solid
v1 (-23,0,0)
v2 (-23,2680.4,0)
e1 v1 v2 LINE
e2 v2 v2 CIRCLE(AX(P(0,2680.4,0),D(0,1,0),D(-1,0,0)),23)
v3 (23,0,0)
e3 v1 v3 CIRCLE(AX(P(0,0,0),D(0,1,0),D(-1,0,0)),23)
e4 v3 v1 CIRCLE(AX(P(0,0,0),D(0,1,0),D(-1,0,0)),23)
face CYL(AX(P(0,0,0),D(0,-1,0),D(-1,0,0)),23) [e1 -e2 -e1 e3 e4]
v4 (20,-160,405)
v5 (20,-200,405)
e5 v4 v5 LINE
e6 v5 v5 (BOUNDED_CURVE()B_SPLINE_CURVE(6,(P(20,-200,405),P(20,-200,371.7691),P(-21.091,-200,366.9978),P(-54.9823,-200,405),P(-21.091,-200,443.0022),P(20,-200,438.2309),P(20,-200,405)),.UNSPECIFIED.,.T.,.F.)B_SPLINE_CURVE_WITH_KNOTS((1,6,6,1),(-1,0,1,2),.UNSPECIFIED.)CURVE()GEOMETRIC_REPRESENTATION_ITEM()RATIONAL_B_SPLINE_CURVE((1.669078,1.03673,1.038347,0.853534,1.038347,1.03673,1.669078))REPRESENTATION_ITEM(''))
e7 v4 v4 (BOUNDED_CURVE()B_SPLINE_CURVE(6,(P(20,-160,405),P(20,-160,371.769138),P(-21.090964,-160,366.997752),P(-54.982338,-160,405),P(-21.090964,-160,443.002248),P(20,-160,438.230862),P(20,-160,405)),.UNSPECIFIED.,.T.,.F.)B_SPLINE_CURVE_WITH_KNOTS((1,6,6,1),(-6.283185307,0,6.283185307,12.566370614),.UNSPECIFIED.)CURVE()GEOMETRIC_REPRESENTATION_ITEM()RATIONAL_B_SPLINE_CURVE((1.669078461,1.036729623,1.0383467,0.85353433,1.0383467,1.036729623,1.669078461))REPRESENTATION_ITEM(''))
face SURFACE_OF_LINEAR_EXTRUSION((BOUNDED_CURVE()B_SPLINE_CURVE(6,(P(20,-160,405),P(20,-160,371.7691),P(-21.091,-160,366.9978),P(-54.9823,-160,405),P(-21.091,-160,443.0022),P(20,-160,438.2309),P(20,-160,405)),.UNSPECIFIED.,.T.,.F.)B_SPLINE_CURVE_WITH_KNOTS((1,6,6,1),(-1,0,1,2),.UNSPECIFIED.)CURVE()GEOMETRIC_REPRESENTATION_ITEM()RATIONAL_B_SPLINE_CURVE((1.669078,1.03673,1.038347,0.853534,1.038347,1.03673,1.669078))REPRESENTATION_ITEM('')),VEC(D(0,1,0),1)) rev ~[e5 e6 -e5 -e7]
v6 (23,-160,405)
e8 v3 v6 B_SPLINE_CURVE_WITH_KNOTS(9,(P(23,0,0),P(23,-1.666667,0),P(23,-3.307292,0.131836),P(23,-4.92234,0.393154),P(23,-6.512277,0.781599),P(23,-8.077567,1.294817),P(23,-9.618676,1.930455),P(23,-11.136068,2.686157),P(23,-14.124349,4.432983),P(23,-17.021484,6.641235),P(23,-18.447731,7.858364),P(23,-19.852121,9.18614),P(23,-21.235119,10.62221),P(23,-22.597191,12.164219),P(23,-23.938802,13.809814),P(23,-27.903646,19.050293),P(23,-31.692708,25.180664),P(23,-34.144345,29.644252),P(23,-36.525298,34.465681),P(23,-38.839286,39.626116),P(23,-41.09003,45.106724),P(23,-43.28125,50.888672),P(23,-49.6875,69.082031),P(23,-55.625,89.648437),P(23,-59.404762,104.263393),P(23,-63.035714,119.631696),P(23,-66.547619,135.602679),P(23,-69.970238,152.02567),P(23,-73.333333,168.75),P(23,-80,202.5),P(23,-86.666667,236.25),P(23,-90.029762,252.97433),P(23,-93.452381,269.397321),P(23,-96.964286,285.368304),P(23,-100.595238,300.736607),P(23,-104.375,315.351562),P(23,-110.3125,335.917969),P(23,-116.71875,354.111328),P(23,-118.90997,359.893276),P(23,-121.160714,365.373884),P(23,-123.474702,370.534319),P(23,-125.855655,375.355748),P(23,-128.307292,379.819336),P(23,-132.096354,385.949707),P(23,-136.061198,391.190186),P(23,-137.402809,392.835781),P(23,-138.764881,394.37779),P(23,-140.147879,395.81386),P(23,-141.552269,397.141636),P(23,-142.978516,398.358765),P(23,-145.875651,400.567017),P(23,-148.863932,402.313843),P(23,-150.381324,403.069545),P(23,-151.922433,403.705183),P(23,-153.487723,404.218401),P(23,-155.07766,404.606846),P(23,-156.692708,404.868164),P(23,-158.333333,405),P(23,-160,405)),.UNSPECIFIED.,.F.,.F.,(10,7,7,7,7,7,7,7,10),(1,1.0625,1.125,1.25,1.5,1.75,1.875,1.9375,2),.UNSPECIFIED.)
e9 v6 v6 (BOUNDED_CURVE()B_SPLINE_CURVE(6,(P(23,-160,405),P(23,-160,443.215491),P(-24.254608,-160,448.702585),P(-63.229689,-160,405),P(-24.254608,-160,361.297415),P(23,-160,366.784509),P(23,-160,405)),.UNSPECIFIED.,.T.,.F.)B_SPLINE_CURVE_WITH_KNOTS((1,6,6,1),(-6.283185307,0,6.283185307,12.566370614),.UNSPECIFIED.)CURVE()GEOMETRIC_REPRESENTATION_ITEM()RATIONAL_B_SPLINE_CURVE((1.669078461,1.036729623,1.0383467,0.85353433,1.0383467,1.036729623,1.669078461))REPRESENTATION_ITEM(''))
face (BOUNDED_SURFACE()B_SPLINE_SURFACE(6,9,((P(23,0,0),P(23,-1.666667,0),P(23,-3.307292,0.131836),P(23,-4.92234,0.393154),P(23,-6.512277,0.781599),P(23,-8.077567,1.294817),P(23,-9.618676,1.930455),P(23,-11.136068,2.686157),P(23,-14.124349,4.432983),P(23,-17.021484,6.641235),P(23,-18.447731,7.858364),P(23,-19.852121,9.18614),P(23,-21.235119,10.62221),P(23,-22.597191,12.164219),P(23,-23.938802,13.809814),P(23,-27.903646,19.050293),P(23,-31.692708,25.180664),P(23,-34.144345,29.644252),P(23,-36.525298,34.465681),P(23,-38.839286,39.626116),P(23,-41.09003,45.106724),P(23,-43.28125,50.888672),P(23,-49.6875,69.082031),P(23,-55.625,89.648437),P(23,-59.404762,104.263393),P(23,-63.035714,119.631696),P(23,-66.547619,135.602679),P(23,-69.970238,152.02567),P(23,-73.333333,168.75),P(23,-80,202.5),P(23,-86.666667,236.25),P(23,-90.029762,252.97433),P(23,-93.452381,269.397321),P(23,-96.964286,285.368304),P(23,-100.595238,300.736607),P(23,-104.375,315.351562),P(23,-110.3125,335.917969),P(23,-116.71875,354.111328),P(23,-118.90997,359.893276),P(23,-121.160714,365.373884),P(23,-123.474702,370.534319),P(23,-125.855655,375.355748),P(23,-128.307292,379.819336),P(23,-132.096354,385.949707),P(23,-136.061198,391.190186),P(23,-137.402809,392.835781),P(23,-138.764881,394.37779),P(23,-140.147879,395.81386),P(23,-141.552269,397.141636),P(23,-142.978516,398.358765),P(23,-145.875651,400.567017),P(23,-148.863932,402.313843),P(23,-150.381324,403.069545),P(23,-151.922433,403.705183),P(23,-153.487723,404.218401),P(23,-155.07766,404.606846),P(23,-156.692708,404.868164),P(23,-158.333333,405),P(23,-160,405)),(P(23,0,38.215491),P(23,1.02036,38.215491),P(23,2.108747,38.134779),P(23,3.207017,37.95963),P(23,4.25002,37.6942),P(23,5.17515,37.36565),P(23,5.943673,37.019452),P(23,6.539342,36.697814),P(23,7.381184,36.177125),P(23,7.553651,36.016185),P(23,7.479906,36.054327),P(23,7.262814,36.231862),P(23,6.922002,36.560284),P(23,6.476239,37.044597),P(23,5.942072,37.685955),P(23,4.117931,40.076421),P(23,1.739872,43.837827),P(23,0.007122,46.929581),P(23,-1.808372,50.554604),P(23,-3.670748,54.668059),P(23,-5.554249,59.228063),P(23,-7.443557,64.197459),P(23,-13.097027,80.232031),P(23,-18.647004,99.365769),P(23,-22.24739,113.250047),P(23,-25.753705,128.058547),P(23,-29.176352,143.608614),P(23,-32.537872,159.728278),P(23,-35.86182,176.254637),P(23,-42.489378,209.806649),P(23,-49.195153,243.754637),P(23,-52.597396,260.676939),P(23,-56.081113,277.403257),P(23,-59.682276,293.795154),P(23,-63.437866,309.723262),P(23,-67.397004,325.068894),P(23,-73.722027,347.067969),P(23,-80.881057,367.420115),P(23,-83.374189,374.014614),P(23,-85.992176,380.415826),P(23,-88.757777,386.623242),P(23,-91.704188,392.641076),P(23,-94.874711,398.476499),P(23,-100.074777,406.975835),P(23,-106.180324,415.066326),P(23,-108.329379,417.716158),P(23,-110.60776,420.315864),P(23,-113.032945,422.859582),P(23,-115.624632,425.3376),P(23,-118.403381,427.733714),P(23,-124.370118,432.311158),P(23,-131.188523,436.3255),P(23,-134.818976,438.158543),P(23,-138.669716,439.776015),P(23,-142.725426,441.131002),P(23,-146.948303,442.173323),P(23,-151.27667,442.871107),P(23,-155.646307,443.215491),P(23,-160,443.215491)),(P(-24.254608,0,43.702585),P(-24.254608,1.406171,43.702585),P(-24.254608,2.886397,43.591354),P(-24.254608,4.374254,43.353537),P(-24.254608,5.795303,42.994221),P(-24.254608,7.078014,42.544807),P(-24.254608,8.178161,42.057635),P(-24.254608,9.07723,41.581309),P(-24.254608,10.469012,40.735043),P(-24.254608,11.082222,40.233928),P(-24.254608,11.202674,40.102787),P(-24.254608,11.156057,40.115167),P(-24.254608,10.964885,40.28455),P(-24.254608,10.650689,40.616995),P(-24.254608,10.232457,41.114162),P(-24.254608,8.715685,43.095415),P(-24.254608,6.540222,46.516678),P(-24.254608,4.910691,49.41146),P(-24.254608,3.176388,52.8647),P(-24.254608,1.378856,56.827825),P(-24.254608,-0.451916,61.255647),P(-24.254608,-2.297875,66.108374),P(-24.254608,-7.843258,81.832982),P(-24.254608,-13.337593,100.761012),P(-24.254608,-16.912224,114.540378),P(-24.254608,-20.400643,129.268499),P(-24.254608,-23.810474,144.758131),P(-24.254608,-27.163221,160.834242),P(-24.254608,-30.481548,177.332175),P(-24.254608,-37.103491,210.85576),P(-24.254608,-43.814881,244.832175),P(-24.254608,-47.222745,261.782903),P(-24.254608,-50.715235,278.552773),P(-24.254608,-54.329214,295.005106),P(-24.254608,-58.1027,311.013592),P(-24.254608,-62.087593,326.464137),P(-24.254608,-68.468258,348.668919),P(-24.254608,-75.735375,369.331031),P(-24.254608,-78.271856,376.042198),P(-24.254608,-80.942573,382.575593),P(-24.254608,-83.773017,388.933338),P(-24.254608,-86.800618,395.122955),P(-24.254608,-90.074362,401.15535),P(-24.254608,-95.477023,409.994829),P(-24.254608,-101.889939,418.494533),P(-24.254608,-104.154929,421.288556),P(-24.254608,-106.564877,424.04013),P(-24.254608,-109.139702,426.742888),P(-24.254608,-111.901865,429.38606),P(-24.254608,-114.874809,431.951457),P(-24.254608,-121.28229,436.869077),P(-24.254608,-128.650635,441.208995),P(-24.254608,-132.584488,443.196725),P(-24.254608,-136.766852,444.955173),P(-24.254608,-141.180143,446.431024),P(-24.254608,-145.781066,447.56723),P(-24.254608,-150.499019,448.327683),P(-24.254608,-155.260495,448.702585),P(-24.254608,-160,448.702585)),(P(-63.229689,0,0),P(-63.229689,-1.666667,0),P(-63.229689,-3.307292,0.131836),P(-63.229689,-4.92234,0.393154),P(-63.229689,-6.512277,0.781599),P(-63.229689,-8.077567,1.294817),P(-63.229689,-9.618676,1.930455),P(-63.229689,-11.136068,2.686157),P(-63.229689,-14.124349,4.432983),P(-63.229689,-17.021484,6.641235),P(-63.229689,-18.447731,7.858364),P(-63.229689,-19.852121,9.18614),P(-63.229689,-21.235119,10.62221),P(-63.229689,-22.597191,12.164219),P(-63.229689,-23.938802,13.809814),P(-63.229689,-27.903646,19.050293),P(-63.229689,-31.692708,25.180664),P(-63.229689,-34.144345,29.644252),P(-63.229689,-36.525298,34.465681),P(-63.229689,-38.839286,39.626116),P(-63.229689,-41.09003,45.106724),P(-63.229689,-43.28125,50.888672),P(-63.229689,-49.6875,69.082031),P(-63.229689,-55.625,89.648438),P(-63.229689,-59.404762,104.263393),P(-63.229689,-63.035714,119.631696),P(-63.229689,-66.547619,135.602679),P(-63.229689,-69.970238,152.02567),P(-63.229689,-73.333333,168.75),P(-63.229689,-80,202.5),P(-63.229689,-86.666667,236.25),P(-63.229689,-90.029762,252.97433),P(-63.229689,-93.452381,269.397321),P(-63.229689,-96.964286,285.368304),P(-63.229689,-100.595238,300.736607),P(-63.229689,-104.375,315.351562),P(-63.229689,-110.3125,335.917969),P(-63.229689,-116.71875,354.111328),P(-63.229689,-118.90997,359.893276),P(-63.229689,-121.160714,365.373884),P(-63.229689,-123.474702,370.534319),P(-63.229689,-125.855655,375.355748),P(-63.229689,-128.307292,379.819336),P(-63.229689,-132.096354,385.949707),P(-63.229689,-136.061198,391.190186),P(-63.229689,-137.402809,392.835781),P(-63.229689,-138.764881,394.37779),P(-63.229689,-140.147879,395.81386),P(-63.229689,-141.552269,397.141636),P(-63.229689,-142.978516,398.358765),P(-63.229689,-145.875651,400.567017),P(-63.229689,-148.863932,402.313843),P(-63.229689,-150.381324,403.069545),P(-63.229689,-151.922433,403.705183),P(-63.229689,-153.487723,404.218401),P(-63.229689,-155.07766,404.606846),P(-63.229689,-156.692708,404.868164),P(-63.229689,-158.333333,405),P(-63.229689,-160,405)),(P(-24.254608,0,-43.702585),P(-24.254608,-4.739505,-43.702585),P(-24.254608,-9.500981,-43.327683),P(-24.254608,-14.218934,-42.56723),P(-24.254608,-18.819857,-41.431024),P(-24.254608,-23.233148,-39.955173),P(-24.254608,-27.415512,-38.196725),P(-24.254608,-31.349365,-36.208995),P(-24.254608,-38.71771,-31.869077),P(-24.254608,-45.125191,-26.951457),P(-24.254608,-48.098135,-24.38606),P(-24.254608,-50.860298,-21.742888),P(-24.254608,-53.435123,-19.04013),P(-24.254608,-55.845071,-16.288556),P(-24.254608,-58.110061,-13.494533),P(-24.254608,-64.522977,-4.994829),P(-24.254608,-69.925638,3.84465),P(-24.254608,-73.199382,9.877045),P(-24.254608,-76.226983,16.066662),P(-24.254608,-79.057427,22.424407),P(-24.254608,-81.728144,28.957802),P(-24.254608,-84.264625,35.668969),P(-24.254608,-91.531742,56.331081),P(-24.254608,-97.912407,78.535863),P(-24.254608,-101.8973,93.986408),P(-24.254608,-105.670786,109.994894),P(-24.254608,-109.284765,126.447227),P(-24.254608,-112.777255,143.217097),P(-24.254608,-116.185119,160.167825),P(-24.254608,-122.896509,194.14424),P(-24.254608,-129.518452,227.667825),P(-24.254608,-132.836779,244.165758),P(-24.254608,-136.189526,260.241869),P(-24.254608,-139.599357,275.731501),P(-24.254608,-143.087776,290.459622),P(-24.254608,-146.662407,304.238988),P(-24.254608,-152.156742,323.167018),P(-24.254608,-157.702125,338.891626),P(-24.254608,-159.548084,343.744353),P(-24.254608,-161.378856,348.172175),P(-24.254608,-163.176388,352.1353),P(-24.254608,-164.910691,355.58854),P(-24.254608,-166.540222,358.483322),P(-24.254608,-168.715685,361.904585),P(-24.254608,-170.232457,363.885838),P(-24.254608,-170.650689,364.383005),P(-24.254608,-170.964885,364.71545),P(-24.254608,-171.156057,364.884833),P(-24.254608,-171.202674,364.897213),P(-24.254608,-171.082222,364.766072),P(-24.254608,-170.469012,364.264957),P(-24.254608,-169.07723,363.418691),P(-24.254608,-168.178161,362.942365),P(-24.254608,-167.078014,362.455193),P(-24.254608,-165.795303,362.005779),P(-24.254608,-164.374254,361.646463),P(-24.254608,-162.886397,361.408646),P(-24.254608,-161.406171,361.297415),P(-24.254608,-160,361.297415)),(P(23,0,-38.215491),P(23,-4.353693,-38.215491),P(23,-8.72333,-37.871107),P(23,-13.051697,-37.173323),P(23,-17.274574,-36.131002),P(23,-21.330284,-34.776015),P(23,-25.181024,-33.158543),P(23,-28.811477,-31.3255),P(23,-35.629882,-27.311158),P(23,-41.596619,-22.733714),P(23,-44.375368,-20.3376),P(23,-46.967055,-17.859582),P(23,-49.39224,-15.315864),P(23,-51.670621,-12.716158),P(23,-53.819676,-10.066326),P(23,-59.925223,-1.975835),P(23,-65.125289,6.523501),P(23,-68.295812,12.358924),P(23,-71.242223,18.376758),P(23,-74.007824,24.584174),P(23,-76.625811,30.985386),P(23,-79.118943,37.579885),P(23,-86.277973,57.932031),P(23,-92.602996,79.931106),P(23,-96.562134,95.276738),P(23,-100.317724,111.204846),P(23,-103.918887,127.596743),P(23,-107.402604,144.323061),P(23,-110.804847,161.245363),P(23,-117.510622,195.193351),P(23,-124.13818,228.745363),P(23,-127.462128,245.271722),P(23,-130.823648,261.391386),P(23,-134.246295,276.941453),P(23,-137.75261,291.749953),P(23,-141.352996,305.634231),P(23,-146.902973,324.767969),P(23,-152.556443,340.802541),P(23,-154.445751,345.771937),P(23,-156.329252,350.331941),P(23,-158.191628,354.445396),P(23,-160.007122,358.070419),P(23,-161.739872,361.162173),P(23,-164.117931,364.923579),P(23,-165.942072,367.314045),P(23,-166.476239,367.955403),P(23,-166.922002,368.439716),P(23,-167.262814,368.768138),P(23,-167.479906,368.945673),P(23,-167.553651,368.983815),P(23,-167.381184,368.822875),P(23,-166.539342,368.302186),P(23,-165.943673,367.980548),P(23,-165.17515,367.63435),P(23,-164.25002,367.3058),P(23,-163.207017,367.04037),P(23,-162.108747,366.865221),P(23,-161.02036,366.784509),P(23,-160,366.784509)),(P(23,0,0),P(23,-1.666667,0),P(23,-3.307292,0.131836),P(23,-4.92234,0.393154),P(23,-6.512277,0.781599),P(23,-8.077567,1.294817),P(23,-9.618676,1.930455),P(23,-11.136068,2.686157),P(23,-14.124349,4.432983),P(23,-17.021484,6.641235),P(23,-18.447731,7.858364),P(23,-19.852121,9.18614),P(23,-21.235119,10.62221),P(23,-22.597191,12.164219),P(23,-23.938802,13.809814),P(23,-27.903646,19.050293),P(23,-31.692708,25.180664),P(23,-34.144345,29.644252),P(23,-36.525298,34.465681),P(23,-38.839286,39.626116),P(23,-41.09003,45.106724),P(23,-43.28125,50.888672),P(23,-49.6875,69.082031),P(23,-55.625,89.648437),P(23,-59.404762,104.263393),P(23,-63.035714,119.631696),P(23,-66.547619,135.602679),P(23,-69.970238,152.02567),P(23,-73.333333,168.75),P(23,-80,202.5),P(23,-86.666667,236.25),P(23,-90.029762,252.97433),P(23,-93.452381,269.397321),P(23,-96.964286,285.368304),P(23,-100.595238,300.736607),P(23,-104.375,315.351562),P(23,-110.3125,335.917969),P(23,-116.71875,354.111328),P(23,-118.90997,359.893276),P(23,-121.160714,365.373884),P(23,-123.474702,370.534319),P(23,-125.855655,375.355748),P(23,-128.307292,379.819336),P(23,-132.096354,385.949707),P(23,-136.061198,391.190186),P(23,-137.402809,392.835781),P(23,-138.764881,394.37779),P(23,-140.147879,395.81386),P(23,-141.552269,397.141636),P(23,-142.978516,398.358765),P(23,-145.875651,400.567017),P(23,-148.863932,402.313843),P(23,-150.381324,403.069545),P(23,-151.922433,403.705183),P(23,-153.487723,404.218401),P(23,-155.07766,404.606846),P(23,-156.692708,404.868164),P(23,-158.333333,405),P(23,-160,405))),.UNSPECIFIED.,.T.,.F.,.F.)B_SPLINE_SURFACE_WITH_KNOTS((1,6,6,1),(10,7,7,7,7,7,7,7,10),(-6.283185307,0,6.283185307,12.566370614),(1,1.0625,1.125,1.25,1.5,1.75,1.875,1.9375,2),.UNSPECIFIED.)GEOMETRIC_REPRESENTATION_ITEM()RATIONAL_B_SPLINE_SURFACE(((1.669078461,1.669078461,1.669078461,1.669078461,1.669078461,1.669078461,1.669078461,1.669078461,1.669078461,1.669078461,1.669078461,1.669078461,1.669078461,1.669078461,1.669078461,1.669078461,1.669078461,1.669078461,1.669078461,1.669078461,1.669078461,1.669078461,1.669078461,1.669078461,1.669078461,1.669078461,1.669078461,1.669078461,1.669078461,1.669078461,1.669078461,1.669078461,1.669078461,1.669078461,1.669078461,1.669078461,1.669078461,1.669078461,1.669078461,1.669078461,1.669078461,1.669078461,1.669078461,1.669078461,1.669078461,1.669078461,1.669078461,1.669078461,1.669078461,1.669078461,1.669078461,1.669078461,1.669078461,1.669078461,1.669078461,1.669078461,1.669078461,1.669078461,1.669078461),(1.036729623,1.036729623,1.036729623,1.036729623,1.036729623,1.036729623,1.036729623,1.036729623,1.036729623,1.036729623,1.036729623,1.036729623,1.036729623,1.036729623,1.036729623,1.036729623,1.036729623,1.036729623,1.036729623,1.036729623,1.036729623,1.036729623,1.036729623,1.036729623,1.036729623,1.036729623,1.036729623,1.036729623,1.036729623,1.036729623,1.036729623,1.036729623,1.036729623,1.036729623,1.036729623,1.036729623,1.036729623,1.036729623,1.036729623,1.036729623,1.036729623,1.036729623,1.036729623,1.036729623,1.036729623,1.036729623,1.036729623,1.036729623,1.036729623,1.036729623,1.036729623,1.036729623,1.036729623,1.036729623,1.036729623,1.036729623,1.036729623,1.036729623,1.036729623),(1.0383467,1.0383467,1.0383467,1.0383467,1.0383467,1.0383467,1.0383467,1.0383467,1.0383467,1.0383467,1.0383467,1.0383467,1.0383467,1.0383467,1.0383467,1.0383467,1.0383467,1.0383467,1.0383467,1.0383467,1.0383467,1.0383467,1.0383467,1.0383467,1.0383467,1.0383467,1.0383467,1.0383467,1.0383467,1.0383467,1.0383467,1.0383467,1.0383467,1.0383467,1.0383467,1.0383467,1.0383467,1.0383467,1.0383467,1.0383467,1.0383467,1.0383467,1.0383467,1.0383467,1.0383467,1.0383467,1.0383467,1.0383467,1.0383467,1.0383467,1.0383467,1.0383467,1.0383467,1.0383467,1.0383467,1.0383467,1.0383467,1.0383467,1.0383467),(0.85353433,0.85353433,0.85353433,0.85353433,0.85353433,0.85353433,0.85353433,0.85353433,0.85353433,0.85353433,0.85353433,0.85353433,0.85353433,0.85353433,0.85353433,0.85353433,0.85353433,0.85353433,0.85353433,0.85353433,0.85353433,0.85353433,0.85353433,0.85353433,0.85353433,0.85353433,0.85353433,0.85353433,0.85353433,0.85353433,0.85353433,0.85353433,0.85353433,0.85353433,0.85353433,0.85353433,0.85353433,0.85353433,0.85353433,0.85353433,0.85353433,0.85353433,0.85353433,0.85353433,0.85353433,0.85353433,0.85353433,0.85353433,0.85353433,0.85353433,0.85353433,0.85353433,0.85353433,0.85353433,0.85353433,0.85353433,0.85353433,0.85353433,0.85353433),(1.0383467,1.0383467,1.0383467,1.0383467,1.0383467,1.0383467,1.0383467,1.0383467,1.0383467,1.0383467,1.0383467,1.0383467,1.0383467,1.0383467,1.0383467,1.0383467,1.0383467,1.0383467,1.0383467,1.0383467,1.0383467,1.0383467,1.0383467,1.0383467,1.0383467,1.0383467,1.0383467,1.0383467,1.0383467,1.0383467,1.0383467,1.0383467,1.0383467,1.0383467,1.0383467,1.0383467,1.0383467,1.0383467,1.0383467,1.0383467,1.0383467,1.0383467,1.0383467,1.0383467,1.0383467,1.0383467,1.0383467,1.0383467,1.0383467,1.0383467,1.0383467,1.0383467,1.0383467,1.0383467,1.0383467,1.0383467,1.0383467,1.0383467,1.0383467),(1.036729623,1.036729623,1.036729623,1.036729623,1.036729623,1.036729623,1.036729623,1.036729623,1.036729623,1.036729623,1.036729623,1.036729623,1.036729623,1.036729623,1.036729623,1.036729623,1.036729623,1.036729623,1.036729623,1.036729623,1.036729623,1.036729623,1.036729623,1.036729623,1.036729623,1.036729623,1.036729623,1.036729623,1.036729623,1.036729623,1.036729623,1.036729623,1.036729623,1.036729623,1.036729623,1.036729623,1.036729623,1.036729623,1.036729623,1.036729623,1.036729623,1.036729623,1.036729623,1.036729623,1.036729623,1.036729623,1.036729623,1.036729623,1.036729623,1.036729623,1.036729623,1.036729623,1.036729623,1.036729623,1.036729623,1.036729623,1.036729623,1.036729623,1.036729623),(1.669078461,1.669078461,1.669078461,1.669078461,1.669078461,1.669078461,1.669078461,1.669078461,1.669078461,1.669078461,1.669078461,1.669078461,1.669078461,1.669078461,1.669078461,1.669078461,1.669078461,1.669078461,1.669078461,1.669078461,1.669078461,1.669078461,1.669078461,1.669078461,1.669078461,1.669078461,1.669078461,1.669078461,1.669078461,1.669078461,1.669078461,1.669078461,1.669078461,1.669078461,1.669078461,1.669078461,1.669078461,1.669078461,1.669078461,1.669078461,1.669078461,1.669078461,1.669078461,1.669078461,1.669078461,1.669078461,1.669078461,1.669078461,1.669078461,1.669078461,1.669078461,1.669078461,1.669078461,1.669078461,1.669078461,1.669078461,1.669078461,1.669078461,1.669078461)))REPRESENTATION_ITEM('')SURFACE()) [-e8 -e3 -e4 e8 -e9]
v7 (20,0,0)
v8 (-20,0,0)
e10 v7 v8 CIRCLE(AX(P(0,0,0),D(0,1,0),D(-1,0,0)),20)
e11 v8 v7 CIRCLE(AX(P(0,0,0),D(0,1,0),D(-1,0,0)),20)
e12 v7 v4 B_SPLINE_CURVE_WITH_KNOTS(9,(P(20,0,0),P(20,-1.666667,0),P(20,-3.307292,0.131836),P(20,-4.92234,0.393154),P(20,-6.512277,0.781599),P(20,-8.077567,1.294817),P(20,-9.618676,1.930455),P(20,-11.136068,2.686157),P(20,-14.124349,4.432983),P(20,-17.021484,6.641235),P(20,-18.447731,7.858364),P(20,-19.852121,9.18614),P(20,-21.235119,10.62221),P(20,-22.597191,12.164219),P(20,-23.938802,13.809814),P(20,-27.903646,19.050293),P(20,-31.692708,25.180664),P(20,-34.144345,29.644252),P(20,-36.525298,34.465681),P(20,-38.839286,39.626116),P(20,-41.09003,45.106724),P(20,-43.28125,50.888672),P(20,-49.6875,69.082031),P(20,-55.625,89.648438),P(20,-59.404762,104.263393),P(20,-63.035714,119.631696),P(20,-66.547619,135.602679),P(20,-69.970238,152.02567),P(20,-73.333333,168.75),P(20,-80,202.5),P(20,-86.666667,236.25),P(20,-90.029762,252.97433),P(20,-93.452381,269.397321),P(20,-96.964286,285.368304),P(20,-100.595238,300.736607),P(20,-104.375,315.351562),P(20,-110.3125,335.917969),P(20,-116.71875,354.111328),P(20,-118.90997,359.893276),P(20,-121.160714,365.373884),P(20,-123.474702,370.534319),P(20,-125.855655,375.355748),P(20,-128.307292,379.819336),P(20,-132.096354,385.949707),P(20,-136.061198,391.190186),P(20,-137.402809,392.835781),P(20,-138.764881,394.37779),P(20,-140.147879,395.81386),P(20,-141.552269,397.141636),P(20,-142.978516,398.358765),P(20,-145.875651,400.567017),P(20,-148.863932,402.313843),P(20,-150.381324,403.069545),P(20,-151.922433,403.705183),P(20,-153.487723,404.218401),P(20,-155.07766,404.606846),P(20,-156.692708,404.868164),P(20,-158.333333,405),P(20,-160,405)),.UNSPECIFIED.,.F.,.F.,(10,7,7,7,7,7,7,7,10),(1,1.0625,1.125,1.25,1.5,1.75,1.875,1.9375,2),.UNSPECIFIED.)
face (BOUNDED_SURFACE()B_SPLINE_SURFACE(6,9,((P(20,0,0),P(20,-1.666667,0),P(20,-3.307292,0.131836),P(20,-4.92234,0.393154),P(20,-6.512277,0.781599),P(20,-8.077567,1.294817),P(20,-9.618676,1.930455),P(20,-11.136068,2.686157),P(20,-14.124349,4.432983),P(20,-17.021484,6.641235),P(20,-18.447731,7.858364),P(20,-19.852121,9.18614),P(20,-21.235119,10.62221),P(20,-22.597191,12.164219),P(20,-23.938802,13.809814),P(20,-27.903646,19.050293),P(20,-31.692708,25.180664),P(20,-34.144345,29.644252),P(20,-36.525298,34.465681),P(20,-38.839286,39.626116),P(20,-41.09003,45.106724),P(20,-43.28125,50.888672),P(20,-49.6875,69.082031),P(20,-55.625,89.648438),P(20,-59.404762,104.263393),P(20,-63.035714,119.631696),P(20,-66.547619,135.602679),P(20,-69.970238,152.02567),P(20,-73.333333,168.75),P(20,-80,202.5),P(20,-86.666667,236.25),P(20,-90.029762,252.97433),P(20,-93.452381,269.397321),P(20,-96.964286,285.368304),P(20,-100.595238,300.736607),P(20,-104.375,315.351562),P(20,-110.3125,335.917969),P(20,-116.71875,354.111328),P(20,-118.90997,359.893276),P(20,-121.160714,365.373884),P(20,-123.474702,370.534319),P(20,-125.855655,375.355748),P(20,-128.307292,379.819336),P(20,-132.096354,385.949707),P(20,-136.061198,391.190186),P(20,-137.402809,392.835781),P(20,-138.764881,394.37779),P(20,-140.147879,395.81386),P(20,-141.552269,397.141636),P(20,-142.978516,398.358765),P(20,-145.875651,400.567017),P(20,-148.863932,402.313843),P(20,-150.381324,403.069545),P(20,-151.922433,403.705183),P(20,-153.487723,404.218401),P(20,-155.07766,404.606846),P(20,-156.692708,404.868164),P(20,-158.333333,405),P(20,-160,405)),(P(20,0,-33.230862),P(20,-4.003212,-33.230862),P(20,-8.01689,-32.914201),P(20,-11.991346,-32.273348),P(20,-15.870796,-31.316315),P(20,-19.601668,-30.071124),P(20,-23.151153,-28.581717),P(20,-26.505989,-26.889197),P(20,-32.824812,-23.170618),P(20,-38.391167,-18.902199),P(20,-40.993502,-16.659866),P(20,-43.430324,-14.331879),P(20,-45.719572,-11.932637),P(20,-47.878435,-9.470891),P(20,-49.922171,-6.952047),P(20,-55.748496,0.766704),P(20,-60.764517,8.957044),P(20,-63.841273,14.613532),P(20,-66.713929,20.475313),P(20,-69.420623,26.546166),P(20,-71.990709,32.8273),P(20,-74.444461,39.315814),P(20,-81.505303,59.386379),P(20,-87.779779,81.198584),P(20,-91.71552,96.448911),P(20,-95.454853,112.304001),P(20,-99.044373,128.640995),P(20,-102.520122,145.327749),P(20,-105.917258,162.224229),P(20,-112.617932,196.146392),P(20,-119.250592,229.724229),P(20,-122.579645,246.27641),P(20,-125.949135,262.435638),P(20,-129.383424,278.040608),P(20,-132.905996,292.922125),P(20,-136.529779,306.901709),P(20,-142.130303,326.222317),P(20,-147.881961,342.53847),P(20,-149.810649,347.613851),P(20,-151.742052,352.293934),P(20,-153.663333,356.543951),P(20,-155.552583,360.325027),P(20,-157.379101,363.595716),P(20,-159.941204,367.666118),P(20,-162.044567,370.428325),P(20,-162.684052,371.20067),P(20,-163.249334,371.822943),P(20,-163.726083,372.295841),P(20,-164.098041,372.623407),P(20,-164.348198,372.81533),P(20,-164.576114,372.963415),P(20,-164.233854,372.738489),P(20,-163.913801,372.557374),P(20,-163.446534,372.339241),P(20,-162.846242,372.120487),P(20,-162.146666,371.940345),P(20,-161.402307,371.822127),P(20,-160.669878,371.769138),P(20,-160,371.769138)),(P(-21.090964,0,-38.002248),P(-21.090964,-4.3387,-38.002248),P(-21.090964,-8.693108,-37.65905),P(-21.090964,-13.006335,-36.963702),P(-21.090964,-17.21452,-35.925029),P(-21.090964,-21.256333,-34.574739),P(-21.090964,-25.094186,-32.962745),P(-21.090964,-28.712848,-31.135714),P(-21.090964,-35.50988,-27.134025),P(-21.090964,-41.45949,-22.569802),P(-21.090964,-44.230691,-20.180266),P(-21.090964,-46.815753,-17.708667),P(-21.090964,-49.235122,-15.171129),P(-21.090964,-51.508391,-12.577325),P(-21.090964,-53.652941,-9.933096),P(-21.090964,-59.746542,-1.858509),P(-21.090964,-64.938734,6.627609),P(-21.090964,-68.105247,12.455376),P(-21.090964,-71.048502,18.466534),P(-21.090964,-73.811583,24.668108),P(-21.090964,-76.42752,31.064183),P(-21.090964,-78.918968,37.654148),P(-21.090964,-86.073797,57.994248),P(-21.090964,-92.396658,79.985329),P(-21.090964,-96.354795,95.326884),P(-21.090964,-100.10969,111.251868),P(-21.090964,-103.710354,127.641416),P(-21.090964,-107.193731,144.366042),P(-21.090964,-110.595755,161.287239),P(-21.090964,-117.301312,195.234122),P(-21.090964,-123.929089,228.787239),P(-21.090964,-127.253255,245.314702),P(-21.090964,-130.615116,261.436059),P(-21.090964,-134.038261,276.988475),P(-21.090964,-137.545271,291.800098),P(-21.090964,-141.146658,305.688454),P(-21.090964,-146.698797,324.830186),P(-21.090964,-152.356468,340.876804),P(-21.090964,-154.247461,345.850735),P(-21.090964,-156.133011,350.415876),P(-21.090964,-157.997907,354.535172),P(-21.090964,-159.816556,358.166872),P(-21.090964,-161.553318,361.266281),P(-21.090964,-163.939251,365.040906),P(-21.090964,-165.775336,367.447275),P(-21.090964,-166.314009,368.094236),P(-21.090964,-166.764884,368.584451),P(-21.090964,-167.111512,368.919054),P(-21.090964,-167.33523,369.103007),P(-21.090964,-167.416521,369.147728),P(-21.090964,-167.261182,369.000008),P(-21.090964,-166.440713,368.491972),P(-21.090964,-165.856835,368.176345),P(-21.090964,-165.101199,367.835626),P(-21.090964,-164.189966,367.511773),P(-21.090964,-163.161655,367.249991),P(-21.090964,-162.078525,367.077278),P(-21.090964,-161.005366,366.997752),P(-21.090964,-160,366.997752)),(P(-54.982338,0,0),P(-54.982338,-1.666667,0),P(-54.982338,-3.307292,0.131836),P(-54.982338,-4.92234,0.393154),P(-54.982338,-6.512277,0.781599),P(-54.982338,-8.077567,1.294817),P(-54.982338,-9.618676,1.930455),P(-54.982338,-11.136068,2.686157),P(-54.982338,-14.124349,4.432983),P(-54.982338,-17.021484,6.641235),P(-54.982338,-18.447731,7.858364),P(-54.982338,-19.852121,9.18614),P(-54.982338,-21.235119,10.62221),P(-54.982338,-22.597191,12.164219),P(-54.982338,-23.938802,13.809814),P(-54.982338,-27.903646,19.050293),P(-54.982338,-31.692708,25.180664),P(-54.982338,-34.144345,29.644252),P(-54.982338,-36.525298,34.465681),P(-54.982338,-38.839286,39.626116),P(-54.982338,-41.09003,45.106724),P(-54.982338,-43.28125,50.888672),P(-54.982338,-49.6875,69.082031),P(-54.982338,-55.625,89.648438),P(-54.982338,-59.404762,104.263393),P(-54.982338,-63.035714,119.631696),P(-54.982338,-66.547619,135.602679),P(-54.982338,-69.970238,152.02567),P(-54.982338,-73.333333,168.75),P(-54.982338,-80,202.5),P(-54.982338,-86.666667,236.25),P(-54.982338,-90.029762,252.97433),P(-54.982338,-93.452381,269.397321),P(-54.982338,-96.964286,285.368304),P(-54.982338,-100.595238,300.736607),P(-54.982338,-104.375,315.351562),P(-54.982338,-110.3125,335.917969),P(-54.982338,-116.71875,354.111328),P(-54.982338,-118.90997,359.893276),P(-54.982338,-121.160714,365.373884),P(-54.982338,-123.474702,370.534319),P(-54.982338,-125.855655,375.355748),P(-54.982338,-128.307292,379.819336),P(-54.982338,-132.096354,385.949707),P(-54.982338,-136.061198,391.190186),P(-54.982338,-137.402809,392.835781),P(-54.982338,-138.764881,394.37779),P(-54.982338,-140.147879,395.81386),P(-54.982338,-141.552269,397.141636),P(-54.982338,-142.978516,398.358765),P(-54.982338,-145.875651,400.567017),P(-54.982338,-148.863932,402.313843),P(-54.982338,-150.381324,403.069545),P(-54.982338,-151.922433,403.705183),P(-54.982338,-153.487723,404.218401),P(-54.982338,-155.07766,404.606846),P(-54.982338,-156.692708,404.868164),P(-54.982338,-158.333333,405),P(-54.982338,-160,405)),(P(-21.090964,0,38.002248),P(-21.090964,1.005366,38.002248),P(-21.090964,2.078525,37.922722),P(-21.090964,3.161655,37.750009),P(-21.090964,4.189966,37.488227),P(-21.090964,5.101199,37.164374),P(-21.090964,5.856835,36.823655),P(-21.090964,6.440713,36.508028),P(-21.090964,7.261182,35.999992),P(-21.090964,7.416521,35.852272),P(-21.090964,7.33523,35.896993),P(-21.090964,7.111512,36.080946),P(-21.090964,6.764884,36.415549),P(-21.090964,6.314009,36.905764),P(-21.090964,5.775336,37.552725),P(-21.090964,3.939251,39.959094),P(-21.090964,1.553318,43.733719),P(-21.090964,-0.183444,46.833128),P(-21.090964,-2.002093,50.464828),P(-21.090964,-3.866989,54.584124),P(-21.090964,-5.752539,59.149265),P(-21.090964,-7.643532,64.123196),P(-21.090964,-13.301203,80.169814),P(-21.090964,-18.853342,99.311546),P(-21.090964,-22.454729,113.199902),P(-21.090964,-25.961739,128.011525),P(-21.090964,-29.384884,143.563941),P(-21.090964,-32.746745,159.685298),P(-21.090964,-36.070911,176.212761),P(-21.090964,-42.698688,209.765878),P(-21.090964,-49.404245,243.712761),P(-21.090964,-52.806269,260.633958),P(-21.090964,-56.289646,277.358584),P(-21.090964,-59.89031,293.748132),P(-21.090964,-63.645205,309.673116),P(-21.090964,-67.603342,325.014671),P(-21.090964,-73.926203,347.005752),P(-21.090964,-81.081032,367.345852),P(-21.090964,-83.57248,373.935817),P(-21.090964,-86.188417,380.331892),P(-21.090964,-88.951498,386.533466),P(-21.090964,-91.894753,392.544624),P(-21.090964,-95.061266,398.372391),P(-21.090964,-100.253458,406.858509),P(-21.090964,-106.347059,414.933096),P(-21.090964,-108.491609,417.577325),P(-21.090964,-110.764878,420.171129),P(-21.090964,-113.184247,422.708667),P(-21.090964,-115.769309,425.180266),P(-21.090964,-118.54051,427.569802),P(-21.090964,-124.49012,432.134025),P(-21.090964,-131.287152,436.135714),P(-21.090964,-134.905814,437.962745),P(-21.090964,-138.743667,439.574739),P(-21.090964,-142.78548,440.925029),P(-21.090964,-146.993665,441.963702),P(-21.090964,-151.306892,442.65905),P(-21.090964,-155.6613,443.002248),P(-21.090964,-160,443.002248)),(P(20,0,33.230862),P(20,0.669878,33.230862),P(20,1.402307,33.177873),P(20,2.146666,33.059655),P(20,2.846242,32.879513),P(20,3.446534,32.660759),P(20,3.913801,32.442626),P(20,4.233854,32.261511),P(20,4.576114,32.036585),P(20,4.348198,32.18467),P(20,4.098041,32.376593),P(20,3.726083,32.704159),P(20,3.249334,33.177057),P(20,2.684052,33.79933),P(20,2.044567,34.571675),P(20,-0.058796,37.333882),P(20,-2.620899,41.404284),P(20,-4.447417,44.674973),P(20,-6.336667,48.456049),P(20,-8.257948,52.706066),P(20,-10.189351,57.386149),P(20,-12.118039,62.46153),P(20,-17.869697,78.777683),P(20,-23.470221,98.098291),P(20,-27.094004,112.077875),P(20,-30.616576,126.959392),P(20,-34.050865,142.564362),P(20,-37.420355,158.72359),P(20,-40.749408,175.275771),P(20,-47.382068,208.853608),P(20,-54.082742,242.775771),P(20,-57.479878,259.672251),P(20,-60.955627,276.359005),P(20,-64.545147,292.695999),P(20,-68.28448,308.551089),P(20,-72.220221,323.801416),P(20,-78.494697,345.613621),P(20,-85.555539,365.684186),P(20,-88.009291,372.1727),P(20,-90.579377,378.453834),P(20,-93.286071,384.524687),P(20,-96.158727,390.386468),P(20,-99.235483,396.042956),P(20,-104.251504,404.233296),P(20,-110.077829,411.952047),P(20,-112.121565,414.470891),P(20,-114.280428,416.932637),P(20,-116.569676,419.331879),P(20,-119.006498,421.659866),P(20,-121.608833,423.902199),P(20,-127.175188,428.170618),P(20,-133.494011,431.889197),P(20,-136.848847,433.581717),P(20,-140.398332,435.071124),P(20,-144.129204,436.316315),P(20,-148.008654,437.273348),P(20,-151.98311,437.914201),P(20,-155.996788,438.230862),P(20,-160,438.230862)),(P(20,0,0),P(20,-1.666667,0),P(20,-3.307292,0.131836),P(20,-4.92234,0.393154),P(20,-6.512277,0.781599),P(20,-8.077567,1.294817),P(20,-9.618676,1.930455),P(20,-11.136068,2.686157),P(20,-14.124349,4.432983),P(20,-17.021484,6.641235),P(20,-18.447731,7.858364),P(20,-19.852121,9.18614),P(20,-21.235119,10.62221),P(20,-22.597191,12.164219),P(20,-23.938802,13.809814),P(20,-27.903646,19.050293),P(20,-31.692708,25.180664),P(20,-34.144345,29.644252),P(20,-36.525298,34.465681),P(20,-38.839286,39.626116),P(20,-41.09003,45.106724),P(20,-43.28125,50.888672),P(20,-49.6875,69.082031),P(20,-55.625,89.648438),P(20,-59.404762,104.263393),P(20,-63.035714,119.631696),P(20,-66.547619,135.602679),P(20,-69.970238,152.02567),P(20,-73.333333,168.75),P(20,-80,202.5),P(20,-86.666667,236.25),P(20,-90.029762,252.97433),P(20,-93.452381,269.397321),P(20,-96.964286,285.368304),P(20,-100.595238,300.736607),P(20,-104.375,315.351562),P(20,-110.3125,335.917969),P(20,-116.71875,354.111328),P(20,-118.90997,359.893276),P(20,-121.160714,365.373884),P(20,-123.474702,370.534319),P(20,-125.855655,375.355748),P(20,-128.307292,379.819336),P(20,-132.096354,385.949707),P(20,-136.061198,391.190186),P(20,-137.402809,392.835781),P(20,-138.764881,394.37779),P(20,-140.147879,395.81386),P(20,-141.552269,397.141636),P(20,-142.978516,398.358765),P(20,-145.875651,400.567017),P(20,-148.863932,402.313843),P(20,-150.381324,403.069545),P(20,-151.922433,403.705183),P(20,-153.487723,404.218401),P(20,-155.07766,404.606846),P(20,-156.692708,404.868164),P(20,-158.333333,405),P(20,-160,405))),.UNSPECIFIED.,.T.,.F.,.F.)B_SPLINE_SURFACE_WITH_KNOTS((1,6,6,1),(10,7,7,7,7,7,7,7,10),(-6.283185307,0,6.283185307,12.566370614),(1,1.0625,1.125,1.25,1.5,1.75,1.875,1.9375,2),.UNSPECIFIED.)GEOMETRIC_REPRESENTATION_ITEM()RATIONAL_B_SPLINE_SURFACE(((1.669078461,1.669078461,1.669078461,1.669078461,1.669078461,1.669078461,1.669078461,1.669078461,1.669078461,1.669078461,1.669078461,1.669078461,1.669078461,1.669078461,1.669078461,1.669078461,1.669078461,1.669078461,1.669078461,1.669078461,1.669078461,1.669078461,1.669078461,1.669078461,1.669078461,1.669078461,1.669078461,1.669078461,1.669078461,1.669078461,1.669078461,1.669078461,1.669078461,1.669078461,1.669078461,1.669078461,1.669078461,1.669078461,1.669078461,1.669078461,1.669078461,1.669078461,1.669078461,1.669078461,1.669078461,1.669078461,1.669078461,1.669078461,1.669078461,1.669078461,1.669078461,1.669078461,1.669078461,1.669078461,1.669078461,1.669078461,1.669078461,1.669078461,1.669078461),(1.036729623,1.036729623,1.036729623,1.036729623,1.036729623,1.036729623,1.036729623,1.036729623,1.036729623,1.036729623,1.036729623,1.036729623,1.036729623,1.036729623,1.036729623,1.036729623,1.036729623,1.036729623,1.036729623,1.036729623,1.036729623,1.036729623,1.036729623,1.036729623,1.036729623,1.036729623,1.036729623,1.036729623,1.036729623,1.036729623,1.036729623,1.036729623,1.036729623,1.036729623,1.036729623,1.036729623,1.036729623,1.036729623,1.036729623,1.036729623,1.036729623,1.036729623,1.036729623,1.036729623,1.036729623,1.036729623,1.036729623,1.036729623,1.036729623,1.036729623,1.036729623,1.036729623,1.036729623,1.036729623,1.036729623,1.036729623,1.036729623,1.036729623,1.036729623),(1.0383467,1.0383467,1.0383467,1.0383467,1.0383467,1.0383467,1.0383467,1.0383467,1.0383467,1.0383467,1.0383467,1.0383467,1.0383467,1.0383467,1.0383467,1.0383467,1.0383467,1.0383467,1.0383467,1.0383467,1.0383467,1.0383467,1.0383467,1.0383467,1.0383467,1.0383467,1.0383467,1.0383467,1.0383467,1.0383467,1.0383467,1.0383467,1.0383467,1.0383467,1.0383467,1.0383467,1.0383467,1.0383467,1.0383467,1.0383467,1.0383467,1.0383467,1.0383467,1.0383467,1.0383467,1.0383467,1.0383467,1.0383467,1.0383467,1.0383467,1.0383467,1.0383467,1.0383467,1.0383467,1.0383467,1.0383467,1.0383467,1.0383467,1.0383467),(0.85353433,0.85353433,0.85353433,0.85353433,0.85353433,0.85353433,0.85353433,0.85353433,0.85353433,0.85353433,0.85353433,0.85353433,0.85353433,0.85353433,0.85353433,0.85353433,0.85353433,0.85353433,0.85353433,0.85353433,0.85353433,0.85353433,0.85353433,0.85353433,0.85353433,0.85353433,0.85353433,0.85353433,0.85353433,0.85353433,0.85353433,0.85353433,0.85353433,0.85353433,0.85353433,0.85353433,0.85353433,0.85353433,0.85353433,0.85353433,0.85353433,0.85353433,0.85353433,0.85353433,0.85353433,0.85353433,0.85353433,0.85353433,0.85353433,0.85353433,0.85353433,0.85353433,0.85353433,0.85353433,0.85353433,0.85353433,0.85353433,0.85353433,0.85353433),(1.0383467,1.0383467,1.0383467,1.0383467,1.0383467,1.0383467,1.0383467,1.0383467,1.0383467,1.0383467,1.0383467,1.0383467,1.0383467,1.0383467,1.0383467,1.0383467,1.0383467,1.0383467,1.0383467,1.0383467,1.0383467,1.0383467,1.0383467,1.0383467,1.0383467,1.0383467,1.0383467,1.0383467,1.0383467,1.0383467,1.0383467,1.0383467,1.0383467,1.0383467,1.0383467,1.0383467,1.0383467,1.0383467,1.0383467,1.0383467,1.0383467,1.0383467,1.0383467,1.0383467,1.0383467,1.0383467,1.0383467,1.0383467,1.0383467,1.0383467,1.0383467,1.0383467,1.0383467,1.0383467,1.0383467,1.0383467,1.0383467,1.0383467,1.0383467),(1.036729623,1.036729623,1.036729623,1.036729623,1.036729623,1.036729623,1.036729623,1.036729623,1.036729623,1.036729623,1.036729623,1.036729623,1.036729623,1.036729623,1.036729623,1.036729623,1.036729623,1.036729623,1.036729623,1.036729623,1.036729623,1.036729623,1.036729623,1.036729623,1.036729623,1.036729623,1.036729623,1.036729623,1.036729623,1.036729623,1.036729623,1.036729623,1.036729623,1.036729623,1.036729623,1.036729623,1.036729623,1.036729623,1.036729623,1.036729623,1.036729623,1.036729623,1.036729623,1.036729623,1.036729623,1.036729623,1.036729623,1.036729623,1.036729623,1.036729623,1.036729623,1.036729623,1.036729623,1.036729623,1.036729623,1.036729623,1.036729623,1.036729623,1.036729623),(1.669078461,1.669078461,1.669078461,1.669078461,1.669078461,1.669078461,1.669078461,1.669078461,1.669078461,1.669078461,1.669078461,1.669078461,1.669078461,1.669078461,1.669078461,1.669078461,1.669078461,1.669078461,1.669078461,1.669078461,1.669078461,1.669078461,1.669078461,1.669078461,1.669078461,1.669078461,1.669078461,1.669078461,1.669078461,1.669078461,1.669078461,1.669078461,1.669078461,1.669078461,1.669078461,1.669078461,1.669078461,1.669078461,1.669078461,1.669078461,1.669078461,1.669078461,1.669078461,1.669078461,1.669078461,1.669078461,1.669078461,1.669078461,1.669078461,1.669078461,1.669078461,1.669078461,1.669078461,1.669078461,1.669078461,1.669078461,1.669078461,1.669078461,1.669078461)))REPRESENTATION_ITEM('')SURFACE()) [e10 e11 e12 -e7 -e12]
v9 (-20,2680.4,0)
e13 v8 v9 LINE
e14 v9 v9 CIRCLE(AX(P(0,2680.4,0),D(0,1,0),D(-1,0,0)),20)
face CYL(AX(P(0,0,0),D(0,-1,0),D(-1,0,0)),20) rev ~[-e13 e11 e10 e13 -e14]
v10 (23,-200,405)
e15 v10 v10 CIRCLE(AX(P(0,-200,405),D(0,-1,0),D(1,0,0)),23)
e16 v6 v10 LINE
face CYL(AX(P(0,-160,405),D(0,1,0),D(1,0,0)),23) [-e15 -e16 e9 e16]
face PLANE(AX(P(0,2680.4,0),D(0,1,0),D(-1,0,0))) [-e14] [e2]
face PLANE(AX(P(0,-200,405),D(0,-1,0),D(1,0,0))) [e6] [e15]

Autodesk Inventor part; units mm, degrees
ref_plane "YZ Plane" through (0, 0, 0) normal (1, 0, 0) x (0, 1, 0)
ref_plane "XZ Plane" through (0, 0, 0) normal (0, 1, 0) x (-1, 0, 0)
ref_plane "XY Plane" through (0, 0, 0) normal (0, 0, 1) x (1, 0, 0)
sketch "Sketch1" plane through (0, 0, 0) normal (0, 1, 0) x (-1, 0, 0)
  circle A0 centre (0, 0) radius 23
  circle A1 centre (0, 0) radius 20
  dimension "d0" = 3
  dimension "d1" = 40
extrude "Extrusion1" add sketch "Sketch1" along normal blind 2680.4
sketch "Sketch2" plane through (0, 0, 0) normal (0, 0, 1) x (1, 0, 0)
  line L0 (23, 2680.4) -> (-23, 2680.4) projected
  point P0 (0, 0)
  point P1 (0, 2673.4)
  point P2 (0, 2680.4)
  dimension "d4" = 7
hole "Hole1" [suppressed]
sketch3d "3D Sketch1"
sketch "Sketch3" plane through (0, 0, 0) normal (0, -1, 0) x (1, 0, 0)
  circle A0 centre (0, 0) radius 20 projected
  circle A1 centre (0, 0) radius 23 projected
sweep "Sweep1" [suppressed]
sketch "Sketch4" plane through (162.5, -96, -92.5) normal (0, 0, -1) x (-1, 0, 0)
  circle A0 centre (0, 0) radius 23 projected
  point P0 (162.5, 96)
  point P1 (-22.6674, -3.8973)
extrude "Extrusion2" [suppressed]
sketch "Sketch5" plane through (0, 0, 0) normal (0, -1, 0) x (1, 0, 0)
  circle A0 centre (0, 0) radius 20 projected
  circle A1 centre (0, 0) radius 23 projected
sketch3d "3D Sketch2"
  spline S0 degree 3 poles (0, 0, 0) (0, -80, 0) (0, -80, 405) (0, -160, 405) knots 1 1 1 1 2 2 2 2
  dimension "d28" = 80
  dimension "d29" = 405
  dimension "d30" = 80
sweep "Sweep2" add profiles "Sketch5" path "3D Sketch2"
sketch "Sketch6" plane through (0, -160, 405) normal (0, -1, 0) x (1, 0, 0)
  spline S0 degree 6 poles (20, 0) (20, -33.2309) (-21.091, -38.0022) (-54.9823, 0) (-21.091, 38.0022) (20, 33.2309) (20, 0) knots 0 0 0 0 0 0 0 1 1 1 1 1 1 1 weights 1.669078 1.03673 1.038347 0.853534 1.038347 1.03673 1.669078 projected
  circle A0 centre (0, 0) radius 23 projected
  point P0 (0, -405)
  point P1 (23, 0)
extrude "Extrusion3" add sketch "Sketch6" along normal blind 40
properties part number "Top_End Pipe 1" material "PMMA Plastic"
